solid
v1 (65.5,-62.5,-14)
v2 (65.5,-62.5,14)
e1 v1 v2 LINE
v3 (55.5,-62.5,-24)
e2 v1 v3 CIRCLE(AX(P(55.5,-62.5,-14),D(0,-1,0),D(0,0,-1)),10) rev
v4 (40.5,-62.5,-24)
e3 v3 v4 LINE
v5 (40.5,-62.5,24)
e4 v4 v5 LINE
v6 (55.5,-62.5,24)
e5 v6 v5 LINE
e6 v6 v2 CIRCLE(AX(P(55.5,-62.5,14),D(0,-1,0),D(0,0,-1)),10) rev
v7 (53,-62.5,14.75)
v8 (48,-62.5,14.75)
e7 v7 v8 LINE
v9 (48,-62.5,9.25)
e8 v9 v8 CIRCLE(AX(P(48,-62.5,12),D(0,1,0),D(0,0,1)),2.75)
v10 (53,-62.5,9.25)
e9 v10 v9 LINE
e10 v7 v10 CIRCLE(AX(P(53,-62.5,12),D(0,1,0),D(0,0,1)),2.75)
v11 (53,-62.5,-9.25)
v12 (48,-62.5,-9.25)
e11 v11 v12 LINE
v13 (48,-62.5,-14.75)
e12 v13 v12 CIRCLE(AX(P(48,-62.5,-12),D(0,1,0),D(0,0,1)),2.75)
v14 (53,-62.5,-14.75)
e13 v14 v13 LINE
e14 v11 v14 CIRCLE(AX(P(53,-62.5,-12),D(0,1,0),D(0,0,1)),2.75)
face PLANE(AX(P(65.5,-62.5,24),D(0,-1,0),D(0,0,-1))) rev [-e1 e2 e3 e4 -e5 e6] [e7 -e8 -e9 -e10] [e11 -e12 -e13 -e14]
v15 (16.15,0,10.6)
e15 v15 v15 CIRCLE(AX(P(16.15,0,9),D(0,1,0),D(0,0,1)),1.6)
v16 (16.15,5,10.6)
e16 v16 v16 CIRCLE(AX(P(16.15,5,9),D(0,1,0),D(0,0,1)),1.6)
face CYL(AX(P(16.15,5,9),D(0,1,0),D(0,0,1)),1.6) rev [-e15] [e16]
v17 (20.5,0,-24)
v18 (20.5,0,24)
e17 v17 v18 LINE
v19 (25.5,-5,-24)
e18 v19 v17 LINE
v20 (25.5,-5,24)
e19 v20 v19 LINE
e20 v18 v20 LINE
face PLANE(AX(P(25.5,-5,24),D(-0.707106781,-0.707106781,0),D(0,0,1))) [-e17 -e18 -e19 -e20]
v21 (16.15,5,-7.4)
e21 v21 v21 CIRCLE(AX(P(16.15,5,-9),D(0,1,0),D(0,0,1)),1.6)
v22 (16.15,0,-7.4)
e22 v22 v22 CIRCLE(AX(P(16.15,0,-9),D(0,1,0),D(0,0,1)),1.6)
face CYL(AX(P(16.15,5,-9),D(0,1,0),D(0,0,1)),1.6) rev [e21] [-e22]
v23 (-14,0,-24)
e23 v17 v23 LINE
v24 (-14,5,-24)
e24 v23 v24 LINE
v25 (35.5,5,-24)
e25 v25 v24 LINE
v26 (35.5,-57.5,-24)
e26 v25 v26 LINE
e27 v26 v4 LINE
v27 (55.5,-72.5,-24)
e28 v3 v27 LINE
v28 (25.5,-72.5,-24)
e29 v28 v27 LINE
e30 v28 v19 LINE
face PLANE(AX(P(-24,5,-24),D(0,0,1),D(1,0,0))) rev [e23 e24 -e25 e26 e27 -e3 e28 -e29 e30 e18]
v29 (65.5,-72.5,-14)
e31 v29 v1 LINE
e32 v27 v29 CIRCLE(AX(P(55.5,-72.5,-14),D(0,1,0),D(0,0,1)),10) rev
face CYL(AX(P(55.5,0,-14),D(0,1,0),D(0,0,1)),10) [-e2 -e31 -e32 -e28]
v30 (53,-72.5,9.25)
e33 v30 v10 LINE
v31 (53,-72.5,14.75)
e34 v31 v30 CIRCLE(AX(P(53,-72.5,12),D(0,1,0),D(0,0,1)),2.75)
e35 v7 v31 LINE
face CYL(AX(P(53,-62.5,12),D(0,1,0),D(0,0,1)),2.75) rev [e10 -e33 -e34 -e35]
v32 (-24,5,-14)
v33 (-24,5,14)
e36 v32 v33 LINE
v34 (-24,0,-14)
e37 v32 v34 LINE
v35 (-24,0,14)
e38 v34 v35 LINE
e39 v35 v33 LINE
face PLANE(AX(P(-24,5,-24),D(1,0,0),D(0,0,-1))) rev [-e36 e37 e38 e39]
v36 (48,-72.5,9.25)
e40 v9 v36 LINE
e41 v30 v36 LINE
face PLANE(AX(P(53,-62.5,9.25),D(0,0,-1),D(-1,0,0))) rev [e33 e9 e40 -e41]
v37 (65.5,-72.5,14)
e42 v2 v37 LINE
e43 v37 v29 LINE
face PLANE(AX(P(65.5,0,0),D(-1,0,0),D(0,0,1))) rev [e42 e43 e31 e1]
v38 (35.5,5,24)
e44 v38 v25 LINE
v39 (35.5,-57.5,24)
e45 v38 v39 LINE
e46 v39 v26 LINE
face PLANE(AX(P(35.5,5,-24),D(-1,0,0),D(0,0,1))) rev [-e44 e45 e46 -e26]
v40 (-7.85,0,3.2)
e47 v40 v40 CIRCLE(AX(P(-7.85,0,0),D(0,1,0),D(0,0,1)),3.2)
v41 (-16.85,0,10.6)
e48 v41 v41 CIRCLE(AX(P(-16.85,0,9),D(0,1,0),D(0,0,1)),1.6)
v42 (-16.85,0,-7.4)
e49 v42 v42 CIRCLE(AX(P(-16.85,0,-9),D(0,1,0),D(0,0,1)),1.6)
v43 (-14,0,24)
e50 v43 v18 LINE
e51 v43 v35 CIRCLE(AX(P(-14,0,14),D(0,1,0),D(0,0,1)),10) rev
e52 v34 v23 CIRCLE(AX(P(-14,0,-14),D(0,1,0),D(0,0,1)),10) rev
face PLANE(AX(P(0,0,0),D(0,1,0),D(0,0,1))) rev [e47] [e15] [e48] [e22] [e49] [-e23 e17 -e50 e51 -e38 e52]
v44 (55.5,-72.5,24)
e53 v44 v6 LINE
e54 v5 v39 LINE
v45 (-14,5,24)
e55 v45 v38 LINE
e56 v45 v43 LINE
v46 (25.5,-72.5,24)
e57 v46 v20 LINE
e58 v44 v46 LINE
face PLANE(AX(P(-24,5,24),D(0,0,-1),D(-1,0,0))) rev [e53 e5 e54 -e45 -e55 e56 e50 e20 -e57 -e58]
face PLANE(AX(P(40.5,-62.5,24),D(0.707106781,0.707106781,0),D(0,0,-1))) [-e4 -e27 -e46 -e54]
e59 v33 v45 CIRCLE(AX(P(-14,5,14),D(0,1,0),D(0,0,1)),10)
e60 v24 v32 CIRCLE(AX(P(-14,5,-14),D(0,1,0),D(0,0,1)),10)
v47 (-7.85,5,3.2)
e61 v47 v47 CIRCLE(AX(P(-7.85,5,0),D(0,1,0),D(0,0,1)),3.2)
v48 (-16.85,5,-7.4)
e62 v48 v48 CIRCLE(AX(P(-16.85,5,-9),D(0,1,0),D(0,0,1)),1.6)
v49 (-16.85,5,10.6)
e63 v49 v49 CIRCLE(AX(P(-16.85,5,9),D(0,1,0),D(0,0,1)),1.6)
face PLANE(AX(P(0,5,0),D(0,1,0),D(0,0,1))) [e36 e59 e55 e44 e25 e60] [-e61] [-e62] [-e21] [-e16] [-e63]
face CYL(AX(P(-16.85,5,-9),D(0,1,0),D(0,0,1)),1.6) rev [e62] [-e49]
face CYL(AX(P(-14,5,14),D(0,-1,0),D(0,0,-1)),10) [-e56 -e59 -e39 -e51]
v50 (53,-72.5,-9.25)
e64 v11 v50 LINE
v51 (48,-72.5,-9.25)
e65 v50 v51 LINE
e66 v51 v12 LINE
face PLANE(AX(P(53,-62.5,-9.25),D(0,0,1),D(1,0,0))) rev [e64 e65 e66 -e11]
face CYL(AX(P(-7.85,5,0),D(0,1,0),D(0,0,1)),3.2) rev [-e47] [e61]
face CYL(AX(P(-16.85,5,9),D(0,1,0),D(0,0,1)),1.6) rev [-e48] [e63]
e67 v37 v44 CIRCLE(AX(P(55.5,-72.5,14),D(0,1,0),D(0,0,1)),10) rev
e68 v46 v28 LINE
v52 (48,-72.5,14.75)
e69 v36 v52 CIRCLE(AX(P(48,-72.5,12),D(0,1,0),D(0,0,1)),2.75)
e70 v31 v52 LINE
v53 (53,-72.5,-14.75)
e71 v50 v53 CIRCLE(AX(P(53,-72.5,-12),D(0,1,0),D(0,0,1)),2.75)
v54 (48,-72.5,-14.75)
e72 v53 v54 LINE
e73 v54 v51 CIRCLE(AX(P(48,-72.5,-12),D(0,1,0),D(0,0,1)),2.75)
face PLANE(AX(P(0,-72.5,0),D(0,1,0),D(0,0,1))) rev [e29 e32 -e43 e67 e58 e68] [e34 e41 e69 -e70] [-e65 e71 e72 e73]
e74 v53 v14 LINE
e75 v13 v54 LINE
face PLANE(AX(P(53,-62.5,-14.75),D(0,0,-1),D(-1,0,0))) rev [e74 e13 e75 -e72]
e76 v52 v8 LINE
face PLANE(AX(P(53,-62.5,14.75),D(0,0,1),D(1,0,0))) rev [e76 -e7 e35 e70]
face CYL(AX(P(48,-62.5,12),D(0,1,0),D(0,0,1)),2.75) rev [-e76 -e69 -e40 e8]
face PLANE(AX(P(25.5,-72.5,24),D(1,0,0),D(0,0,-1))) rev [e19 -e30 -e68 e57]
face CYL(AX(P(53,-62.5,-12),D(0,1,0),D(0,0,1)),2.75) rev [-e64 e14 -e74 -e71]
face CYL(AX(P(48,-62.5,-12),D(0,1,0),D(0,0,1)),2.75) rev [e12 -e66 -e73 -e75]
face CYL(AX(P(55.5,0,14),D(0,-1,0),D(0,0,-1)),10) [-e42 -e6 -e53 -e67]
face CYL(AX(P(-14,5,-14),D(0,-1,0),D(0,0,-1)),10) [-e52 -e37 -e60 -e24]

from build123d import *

# Parameters (mm, degrees)
SKETCH1_W                 = 59.5
SKETCH1_H                 = 48
BOSS_EXTRUDE1_DEPTH       = 5
SKETCH2_W                 = 10
SKETCH2_H                 = 48
BOSS_EXTRUDE2_DEPTH       = 72.5
SKETCH3_W                 = 48
SKETCH3_H                 = 10
BOSS_EXTRUDE3_DEPTH       = 30
FILLET1_R                 = 10
F_1_0MM_START             = -72.5
F_1_0MM_DOWEL_SLOT1_DEPTH = 10
FILLET2_R                 = 10
M3_CLEARANCE_HOLE1_D      = 3.2
M6_CLEARANCE_HOLE1_D      = 6.4
CHAMFER1_SIZE             = 5


# Read off the part's stored shape, not the designer's step: Ø1.0mm Dowel Slot1
with BuildPart() as part:
    # Sketch1 → Boss-Extrude1 (new body)
    with BuildSketch(Plane(origin=(0, 0, 0), x_dir=(1, 0, 0), z_dir=(0, 1, 0))):
        with Locations((5.75, 0)):
            Rectangle(SKETCH1_W, SKETCH1_H)
    extrude(amount=BOSS_EXTRUDE1_DEPTH)

    # Sketch2 → Boss-Extrude2 (add)
    with BuildSketch(Plane.XZ):
        with Locations((30.5, 0)):
            Rectangle(SKETCH2_W, SKETCH2_H)
    extrude(amount=BOSS_EXTRUDE2_DEPTH)

    # Sketch3 → Boss-Extrude3 (add)
    with BuildSketch(Plane(origin=(35.5, 0, 0), x_dir=(0, 0, -1), z_dir=(1, 0, 0))):
        with Locations((0, -67.5)):
            Rectangle(SKETCH3_W, SKETCH3_H)
    extrude(amount=BOSS_EXTRUDE3_DEPTH)

    # Fillet1
    fillet1_edges = [part.edges().sort_by_distance(p)[0] for p in [
        (-24, 2.5, -24),
        (-24, 2.5, 24),
    ]]
    fillet(fillet1_edges, radius=FILLET1_R)

    # Ø1.0mm Dowel Slot1 outline → Ø1.0mm Dowel Slot1 (cut)
    with BuildSketch(Plane(origin=(0, 0, 0), x_dir=(1, 0, 0), z_dir=(0, 1, 0)).offset(F_1_0MM_START)):
        with BuildLine():
            Line((53, 14.75), (48, 14.75))
            ThreePointArc((48, 14.75), (45.25, 12), (48, 9.25))
            Line((48, 9.25), (53, 9.25))
            ThreePointArc((53, 9.25), (55.75, 12), (53, 14.75))
        make_face()
        with BuildLine():
            Line((53, -9.25), (48, -9.25))
            ThreePointArc((48, -9.25), (45.25, -12), (48, -14.75))
            Line((48, -14.75), (53, -14.75))
            ThreePointArc((53, -14.75), (55.75, -12), (53, -9.25))
        make_face()
    extrude(amount=F_1_0MM_DOWEL_SLOT1_DEPTH, mode=Mode.SUBTRACT)

    # Fillet2
    fillet2_edges = [part.edges().sort_by_distance(p)[0] for p in [
        (65.5, -67.5, 24),
        (65.5, -67.5, -24),
    ]]
    fillet(fillet2_edges, radius=FILLET2_R)

    # M3 Clearance Hole1 (through all)
    with Locations(Plane(origin=(0, 5, 0), x_dir=(1, 0, 0), z_dir=(0, 1, 0))):
        with Locations((-16.85, -9), (-16.85, 9), (16.15, 9), (16.15, -9)):
            Hole(M3_CLEARANCE_HOLE1_D / 2)

    # M6 Clearance Hole1 (through all)
    with Locations(Plane(origin=(0, 5, 0), x_dir=(1, 0, 0), z_dir=(0, 1, 0))):
        with Locations((-7.85, 0)):
            Hole(M6_CLEARANCE_HOLE1_D / 2)

    # Chamfer1
    chamfer1_edges = [part.edges().sort_by_distance(p)[0] for p in [
        (25.5, 0, 0),
        (35.5, -62.5, 0),
    ]]
    chamfer(chamfer1_edges, length=CHAMFER1_SIZE)


solid = part.part
